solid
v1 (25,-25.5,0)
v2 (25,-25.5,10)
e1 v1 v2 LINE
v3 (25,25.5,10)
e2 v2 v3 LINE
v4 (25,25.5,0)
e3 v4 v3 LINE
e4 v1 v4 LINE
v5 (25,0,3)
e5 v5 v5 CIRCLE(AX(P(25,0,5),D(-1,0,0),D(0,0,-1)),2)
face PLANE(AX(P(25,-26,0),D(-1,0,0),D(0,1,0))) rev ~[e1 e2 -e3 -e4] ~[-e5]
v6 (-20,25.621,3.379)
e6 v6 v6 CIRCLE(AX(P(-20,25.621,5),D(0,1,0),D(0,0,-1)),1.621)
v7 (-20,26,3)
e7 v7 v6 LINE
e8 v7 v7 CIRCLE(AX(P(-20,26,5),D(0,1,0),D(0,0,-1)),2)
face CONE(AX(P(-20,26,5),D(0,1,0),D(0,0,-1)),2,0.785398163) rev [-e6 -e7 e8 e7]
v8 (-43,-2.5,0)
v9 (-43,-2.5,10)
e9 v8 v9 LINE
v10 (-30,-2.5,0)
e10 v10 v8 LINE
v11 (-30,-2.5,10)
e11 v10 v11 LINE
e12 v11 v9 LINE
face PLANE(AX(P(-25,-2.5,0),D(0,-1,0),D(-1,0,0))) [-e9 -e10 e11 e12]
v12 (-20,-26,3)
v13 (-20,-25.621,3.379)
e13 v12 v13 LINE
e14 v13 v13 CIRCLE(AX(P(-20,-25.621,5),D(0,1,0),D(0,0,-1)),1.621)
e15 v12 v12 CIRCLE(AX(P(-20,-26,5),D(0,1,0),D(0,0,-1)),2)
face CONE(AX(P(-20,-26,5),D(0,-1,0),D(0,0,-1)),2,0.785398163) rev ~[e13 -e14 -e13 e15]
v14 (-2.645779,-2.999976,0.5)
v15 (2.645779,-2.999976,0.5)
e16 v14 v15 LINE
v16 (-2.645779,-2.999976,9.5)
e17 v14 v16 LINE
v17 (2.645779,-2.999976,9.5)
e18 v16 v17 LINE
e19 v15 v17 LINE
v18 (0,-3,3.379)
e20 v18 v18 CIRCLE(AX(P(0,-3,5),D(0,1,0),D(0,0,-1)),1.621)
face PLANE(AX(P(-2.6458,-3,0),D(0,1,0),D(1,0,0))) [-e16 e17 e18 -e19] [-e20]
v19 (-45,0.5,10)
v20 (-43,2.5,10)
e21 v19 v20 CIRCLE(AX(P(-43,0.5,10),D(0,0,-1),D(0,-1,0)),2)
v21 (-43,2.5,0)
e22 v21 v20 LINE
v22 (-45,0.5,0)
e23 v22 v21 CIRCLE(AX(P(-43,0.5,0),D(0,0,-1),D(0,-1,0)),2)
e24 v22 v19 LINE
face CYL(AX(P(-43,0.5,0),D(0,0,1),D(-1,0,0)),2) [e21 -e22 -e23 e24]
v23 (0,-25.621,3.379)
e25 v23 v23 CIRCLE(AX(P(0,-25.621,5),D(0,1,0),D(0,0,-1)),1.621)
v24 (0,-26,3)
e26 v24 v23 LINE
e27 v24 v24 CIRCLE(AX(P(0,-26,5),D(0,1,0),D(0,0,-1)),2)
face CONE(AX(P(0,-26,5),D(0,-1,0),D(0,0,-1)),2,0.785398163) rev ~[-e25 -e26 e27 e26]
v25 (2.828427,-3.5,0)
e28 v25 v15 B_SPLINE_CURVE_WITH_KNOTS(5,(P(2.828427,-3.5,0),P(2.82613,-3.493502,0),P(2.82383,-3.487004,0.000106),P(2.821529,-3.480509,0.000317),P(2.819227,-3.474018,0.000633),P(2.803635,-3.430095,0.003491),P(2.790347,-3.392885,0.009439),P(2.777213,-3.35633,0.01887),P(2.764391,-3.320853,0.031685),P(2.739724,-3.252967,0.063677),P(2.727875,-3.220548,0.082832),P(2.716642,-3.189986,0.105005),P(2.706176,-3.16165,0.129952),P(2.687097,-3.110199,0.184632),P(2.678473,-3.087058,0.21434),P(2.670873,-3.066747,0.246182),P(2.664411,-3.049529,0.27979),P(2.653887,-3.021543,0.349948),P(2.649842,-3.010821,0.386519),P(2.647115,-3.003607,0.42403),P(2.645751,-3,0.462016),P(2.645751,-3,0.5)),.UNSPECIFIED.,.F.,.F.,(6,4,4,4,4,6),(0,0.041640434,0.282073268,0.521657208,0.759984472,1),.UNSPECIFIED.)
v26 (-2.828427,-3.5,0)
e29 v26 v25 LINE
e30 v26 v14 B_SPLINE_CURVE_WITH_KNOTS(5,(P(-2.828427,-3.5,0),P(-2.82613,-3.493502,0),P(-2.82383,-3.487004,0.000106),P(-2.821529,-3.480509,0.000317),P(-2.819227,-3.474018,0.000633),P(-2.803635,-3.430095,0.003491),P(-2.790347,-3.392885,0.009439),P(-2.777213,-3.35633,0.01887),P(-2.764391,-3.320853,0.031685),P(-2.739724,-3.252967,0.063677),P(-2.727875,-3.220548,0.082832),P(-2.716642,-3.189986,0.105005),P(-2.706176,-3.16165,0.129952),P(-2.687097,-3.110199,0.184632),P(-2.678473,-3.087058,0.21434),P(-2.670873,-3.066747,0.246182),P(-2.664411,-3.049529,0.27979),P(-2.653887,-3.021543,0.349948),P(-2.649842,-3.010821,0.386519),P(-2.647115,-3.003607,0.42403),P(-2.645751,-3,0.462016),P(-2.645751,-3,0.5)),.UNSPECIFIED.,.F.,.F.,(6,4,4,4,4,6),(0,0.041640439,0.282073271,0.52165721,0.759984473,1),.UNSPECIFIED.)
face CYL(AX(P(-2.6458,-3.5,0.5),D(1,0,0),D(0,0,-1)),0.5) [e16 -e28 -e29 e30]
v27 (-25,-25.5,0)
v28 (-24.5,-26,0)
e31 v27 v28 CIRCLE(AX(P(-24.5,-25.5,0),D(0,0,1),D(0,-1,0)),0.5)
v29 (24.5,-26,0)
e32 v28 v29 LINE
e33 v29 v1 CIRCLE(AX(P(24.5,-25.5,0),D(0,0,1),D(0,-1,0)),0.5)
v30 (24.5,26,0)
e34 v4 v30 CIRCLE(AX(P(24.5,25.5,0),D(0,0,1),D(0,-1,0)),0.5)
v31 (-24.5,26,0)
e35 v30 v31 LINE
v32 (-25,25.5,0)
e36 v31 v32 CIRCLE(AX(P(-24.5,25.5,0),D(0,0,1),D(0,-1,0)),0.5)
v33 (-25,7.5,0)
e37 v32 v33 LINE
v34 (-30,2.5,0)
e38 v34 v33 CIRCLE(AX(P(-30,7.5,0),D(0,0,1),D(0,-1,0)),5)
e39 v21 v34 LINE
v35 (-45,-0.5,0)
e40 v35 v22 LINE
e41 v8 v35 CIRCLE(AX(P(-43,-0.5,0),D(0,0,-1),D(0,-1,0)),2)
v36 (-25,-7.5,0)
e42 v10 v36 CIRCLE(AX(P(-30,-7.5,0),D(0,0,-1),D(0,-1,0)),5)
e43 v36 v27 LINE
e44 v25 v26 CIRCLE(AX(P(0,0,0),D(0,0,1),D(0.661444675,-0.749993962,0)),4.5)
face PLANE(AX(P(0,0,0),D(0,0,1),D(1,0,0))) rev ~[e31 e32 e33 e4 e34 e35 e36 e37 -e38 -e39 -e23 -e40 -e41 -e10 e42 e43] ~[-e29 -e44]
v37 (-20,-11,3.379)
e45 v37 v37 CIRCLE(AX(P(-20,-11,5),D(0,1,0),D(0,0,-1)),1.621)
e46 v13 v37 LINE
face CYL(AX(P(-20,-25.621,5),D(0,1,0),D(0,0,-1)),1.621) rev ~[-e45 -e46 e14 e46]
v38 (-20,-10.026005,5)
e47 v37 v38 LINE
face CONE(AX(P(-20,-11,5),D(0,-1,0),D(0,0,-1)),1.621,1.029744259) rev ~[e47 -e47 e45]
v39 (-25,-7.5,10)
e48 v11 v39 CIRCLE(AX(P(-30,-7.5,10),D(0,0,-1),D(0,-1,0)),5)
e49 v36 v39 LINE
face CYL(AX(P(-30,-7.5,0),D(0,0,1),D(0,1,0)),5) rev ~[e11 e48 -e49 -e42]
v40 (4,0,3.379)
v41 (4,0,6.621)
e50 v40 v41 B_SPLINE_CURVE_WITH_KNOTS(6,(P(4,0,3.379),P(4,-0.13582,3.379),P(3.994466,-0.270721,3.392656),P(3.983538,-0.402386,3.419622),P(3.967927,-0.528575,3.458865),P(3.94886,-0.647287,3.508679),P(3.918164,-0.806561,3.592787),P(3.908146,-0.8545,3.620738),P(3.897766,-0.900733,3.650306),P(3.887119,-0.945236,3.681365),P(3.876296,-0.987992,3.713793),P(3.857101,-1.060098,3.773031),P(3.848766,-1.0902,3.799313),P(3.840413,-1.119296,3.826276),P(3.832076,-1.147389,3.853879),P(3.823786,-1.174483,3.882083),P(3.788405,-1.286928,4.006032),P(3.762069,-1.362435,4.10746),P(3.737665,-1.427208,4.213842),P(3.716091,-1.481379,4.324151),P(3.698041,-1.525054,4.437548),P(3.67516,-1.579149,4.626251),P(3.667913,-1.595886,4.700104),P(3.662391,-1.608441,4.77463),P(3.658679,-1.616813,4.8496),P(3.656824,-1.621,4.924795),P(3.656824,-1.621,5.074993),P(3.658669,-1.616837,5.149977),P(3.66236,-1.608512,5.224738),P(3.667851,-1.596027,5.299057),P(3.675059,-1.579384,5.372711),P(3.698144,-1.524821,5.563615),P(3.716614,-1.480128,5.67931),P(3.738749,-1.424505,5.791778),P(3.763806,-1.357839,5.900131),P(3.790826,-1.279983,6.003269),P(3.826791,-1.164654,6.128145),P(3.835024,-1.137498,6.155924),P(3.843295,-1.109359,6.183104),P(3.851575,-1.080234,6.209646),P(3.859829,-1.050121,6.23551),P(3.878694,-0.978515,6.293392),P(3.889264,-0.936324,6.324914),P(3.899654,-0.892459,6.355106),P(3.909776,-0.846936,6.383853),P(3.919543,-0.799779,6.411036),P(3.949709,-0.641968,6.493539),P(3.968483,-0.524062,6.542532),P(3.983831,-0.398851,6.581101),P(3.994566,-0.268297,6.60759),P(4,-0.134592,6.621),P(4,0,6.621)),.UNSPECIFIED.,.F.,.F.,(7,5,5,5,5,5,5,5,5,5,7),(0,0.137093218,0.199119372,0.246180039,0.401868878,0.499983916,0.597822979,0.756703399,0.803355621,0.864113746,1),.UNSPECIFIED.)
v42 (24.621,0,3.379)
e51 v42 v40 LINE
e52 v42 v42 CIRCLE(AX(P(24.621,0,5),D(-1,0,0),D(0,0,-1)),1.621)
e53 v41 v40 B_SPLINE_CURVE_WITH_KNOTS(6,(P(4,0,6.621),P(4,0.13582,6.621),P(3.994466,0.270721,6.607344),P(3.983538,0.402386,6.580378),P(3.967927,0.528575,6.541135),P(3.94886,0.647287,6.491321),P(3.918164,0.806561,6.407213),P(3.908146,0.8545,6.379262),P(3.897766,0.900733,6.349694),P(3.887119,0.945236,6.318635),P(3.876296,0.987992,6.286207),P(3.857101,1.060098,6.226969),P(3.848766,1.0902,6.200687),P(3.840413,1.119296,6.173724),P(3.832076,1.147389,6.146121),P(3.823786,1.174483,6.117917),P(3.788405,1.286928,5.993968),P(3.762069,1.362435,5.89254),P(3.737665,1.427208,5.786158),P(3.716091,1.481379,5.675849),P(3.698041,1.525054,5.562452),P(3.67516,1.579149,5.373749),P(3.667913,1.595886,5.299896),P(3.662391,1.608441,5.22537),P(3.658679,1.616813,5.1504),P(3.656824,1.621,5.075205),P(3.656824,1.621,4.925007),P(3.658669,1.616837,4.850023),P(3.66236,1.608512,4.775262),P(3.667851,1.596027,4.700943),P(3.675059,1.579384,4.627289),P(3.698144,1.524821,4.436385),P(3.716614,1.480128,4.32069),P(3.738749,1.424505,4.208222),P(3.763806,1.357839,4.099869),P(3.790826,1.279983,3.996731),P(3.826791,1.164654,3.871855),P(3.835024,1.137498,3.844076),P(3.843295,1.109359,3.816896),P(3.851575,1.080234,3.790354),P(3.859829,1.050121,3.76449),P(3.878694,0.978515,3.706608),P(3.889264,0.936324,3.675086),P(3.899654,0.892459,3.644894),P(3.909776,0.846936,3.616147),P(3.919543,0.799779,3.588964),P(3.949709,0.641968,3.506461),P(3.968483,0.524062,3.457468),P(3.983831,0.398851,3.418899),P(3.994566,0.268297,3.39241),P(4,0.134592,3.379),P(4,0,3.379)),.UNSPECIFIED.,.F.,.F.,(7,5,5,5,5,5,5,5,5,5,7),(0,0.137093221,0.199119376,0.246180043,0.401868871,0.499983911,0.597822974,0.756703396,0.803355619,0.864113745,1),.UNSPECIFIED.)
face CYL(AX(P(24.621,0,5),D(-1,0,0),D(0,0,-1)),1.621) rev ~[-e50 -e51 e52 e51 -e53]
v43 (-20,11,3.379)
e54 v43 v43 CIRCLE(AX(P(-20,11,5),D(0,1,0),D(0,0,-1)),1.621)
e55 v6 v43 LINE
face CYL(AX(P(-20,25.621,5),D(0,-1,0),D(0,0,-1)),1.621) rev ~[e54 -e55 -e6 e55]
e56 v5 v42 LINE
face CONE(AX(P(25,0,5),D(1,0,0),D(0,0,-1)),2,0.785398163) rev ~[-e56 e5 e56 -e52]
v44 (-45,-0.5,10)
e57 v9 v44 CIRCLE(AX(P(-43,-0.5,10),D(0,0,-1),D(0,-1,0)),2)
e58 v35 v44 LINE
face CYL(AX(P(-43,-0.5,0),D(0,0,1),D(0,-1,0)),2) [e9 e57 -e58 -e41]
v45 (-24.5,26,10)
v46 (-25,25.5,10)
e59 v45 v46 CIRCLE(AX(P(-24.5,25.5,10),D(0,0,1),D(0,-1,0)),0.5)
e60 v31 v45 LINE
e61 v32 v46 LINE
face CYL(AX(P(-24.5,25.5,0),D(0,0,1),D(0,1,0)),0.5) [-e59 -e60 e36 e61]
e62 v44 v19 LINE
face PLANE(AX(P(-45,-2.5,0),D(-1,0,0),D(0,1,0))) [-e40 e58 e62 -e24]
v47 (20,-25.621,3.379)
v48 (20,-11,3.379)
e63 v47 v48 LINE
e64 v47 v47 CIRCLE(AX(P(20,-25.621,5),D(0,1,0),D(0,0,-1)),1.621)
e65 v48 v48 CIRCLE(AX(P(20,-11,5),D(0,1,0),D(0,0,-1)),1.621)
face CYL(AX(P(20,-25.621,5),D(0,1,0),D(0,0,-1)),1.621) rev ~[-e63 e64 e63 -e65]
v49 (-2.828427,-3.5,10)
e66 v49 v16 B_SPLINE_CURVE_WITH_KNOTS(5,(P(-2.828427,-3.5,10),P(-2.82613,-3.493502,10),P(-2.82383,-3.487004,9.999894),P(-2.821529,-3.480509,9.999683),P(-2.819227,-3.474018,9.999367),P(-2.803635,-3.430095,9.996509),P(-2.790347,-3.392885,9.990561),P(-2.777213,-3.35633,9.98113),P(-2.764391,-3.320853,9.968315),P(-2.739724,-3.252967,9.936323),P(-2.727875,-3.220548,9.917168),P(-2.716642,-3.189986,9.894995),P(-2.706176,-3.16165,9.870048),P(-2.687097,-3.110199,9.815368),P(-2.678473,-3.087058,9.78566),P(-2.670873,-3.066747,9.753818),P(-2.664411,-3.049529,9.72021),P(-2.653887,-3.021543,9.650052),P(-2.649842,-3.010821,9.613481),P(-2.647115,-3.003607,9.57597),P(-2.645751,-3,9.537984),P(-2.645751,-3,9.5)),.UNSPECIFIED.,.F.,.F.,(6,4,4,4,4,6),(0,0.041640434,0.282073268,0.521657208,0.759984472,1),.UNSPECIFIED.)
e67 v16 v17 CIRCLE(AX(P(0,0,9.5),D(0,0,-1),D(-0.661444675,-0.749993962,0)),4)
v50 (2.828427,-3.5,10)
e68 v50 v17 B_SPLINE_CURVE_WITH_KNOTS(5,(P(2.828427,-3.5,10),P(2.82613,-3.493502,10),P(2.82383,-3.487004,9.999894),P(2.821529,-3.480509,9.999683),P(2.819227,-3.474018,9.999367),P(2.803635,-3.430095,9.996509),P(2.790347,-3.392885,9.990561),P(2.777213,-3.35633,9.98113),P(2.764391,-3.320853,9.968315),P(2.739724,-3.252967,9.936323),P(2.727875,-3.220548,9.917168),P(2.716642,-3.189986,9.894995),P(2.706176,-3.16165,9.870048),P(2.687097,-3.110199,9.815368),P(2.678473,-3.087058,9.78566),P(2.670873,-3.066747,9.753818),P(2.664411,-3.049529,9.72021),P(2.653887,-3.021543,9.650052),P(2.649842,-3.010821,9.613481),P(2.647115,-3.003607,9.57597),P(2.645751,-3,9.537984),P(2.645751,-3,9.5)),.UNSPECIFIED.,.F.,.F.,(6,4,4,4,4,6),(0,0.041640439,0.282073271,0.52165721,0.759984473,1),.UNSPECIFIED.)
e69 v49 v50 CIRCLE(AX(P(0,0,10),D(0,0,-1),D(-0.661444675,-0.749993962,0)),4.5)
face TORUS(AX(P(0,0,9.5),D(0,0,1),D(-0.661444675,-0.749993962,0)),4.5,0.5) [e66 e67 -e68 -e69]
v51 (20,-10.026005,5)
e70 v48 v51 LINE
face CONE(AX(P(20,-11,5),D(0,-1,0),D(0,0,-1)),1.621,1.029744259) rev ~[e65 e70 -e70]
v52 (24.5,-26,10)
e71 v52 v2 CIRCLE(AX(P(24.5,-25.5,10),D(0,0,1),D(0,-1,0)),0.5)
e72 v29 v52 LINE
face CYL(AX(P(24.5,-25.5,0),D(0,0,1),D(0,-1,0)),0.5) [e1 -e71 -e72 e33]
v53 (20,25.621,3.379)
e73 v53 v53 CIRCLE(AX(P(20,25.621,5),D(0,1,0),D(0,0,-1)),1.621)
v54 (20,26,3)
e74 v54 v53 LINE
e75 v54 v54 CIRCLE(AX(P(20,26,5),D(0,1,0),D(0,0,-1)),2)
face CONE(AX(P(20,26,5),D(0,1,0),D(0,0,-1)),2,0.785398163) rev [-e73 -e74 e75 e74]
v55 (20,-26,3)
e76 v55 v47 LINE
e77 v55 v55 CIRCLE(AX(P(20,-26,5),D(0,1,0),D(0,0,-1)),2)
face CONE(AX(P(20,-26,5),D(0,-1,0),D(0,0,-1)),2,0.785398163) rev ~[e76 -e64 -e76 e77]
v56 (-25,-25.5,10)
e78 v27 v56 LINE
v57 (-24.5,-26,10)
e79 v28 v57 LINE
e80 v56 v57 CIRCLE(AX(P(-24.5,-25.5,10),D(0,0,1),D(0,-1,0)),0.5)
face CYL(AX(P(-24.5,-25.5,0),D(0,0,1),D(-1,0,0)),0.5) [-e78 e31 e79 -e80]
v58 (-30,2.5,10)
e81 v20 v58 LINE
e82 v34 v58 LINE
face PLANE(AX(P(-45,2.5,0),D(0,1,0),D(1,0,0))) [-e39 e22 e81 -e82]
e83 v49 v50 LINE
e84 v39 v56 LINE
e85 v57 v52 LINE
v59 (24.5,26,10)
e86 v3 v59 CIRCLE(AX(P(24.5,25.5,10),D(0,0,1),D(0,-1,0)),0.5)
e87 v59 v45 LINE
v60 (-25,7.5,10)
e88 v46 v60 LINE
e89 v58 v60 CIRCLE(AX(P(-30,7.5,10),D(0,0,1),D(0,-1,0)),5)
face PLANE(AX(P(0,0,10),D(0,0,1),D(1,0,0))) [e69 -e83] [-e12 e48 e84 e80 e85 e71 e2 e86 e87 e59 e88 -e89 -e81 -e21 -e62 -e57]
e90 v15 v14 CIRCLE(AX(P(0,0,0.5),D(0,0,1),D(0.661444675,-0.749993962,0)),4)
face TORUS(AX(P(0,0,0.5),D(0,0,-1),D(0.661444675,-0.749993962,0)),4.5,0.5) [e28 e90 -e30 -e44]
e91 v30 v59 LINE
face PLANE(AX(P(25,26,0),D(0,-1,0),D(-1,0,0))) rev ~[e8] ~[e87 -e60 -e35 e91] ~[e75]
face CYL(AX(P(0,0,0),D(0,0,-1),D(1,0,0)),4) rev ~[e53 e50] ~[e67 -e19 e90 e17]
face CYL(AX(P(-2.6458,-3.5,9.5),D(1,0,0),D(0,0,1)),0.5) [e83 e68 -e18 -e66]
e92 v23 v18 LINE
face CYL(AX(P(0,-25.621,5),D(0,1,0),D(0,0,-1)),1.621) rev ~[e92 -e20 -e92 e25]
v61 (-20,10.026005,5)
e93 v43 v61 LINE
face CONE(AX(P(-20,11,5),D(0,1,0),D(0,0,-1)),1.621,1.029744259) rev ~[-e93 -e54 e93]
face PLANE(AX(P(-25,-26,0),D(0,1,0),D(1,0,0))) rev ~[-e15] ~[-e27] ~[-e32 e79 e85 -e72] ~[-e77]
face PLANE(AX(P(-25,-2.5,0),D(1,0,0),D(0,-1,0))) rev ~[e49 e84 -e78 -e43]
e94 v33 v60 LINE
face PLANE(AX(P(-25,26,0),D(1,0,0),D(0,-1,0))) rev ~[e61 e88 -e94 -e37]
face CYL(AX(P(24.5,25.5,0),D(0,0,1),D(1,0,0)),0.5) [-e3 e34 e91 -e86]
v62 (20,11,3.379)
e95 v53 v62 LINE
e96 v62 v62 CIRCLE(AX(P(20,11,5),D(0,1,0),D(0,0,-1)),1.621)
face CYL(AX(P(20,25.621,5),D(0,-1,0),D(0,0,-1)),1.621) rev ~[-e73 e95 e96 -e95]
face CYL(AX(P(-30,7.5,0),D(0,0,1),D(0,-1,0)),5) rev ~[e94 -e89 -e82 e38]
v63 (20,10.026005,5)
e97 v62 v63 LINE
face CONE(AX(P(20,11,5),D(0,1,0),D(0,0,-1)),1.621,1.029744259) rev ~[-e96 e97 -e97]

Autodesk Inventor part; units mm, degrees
ref_plane "YZ Plane" through (0, 0, 0) normal (1, 0, 0) x (0, 1, 0)
ref_plane "XZ Plane" through (0, 0, 0) normal (0, 1, 0) x (-1, 0, 0)
ref_plane "XY Plane" through (0, 0, 0) normal (0, 0, 1) x (1, 0, 0)
sketch "Sketch1" plane through (0, 0, 0) normal (0, 0, 1) x (1, 0, 0)
  line L0 (-25, -26) -> (25, -26)
  line L1 (25, -26) -> (25, 26)
  line L2 (25, 26) -> (-25, 26)
  line L3 (-25, 26) -> (-25, -26)
  line L4 (-25, -26) -> (25, 26) construction
  line L5 (25, -26) -> (-25, 26) construction
  circle A0 centre (0, 0) radius 4
  line L6 (-2.6458, -3) -> (2.6458, -3)
  line L7 (-45, 2.5) -> (-5, 2.5)
  line L8 (-5, 2.5) -> (-5, -2.5)
  line L9 (-5, -2.5) -> (-45, -2.5)
  line L10 (-45, -2.5) -> (-45, 2.5)
  line L11 (-45, 2.5) -> (-5, -2.5) construction
  line L12 (-5, 2.5) -> (-45, -2.5) construction
  point P0 (-25, 0)
  point P1 (-25, -2.5)
  point P2 (-25, 2.5)
  dimension "d0" = 50
  dimension "d1" = 52
  dimension "d2" = 8
  dimension "d39" = 3
  dimension "d40" = 20
  dimension "d41" = 5
extrude "Extrusion1" add sketch "Sketch1" along normal blind 10 contours L3 L9 L8 L7 L2 L1 L0 | L9 L10 L7 L3 | L3 L7 L8 L9 | L6 A0 picked at (-0.6179, -3.1815)
sketch "Sketch2" plane through (-25, -26, 0) normal (0, -1, 0) x (1, 0, 0)
  line L0 (0, 0) -> (0, 10) projected
  line L1 (50, 0) -> (50, 10) projected
  line L2 (0, 0) -> (50, 0) projected
  point P0 (25, 0)
  point P1 (0, 5)
  point P2 (45, 5)
  point P3 (25, 5)
  point P4 (5, 5)
  point P5 (0, 5)
  point P6 (50, 5)
  point P7 (25, 0)
  dimension "d19" = 5
  dimension "d20" = 5
hole "Hole1" at (20, -26, 5) at (-20, -26, 5) direction (0, 1, 0) diameter 3.242 depth 15 tip angle 118 countersink diameter 4 countersink angle 90 thread size "M4x0.7" class "6H" standard "ANSI Metric M Profile"
fillet "Fillet2" radius 0.5 8 edges at (0, 4, 10) (-25, -26, 5) (25, -26, 5) (25, 26, 5) (-25, 26, 5) (0, 4, 0) (0, -3, 10) (0, -3, 0)
hole "Hole2" at (0, -26, 5) direction (0, 1, 0) diameter 3.242 end up to surface countersink diameter 4 countersink angle 90 thread size "M4x0.7" class "6H" standard "ANSI Metric M Profile"
mirror "Mirror1" about plane through (0, 0, 0) normal (0, 1, 0) of "Hole1"
sketch "Sketch3" plane through (25, -25.5, 0.5) normal (1, 0, 0) x (0, 0, -1)
  line L0 (-9.5, 51) -> (0.5, 51) projected
  point P0 (0.5, 25.5)
  point P1 (-4.5, 25.5)
  point P2 (-4.5, 51)
  point P3 (-9, 51)
  point P4 (0, 51)
hole "Hole3" at (25, 0, 5) direction (-1, 0, 0) diameter 3.242 end up to surface countersink diameter 4 countersink angle 90 thread size "M4x0.7" class "6H" standard "ANSI Metric M Profile"
fillet "Fillet3" radius 2 2 edges at (-45, 2.5, 5) (-45, -2.5, 5)
fillet "Fillet4" radius 5 2 edges at (-25, -2.5, 5) (-25, 2.5, 5)
properties part number "bevestegingsKoppeling axis4_5 10mm" material "Aluminum 6061"
